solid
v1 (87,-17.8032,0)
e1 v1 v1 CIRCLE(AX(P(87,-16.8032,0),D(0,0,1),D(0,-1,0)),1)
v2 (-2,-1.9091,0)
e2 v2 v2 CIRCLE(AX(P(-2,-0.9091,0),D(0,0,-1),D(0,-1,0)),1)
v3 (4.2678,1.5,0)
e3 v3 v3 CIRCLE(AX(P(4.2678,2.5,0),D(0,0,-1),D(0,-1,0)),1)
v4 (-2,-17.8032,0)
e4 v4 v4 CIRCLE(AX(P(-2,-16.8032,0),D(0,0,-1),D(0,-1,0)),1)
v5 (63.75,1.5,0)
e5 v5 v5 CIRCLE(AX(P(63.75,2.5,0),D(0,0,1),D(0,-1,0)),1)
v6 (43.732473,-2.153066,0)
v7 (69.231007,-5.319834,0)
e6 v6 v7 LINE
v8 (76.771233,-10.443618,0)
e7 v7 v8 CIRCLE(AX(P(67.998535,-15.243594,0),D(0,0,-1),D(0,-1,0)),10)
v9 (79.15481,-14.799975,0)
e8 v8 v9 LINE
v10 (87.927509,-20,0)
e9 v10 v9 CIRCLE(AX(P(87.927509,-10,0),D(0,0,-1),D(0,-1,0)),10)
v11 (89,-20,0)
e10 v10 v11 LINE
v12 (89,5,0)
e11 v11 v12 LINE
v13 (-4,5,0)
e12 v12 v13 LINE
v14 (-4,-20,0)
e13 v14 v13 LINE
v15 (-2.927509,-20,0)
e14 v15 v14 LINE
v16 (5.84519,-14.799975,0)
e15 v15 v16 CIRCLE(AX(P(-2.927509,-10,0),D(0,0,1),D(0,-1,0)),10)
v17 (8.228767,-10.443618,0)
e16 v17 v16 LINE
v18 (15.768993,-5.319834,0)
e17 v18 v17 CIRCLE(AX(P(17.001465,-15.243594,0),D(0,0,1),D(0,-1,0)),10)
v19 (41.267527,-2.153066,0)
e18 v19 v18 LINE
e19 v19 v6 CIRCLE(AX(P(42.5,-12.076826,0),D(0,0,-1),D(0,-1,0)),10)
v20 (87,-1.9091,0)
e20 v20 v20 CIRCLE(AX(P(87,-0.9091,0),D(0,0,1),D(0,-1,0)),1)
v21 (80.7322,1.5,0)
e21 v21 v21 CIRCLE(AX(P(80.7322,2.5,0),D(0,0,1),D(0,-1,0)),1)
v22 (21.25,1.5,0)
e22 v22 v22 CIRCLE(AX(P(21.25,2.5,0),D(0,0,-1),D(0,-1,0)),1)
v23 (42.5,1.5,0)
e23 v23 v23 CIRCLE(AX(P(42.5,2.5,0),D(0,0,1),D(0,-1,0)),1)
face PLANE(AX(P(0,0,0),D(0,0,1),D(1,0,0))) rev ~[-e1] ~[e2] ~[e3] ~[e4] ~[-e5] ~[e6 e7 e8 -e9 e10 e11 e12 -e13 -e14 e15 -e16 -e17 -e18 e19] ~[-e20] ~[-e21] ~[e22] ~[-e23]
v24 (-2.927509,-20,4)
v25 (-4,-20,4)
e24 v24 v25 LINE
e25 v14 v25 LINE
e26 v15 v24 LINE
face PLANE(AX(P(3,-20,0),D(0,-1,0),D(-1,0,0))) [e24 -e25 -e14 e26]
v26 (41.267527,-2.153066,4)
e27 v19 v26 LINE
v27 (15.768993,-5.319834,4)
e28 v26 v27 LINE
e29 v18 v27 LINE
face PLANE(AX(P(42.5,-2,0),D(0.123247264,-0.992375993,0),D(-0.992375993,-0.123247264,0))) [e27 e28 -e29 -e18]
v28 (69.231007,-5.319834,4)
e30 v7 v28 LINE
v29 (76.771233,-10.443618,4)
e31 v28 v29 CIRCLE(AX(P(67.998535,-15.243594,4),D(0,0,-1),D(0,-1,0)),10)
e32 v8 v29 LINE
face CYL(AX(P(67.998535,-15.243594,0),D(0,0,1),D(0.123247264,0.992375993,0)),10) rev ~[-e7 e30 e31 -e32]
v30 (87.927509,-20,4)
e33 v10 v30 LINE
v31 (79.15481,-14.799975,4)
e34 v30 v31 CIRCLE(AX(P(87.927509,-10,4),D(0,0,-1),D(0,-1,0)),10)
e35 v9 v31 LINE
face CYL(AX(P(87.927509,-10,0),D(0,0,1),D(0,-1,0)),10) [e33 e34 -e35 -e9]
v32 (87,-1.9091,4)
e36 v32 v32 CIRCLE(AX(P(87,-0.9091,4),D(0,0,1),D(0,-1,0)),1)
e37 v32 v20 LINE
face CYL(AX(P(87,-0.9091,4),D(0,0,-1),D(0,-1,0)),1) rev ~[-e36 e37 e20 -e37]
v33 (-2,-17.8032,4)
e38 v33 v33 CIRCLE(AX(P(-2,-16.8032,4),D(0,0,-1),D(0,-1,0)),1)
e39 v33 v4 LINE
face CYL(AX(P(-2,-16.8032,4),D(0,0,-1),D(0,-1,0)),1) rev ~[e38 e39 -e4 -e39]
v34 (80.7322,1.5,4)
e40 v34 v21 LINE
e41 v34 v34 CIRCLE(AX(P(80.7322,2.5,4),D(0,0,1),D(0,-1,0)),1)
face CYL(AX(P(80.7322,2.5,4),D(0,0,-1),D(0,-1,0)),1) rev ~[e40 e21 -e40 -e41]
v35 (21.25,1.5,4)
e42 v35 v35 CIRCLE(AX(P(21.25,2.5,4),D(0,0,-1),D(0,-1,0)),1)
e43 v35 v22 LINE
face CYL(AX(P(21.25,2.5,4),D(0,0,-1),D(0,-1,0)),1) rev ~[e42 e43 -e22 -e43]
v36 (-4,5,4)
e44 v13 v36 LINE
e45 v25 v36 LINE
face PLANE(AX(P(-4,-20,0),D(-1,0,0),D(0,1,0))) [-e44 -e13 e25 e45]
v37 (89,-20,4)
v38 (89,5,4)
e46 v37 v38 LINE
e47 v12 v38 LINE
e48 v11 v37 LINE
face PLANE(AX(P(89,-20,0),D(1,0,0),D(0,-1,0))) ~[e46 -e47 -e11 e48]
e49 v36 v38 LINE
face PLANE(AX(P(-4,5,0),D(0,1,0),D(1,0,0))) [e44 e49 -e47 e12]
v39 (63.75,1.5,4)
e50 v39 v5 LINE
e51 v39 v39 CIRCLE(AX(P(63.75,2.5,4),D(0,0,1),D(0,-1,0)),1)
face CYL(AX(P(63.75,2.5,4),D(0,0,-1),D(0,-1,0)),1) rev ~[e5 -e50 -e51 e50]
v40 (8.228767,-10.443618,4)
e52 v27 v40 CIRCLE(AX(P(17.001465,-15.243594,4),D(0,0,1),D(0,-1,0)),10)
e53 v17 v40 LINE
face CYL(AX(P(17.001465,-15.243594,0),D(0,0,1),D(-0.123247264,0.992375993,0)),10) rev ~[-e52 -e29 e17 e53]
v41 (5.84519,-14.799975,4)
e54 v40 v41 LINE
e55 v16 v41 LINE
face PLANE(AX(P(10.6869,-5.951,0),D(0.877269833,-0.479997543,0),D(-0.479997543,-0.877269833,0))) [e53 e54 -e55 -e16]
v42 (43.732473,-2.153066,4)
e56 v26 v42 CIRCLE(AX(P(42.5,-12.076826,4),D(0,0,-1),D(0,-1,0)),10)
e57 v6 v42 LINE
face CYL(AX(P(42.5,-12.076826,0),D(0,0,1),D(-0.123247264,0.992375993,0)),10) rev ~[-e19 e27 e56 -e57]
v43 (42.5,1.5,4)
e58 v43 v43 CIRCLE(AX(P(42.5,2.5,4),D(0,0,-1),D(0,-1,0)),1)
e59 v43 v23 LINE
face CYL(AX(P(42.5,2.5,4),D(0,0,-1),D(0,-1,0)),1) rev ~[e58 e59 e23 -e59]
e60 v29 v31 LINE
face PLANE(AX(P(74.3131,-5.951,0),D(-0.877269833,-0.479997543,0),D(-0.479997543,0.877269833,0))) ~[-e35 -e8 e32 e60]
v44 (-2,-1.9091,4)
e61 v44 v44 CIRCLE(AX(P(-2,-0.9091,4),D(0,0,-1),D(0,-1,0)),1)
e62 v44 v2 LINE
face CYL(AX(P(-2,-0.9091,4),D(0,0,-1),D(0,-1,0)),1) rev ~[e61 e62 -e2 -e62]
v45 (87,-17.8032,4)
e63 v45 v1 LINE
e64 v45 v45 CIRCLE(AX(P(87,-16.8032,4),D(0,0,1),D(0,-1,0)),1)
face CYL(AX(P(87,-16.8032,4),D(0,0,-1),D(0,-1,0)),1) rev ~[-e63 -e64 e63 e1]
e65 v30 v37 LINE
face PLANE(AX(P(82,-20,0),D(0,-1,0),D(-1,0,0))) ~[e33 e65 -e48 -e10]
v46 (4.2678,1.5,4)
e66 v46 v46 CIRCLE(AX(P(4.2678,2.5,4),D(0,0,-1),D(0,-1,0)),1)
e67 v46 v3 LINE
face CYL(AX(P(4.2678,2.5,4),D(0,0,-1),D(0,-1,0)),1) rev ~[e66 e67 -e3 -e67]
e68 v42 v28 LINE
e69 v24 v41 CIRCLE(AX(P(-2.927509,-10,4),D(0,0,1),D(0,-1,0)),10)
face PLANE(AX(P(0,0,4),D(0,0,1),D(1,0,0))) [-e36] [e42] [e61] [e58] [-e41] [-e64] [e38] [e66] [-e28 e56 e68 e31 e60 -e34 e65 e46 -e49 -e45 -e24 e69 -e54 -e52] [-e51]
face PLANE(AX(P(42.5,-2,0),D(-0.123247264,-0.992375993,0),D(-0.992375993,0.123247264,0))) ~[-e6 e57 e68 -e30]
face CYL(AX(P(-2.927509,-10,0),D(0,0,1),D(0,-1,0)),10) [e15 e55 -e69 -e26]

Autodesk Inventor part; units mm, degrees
ref_plane "YZ Plane" through (0, 0, 0) normal (1, 0, 0) x (0, 1, 0)
ref_plane "XZ Plane" through (0, 0, 0) normal (0, 1, 0) x (-1, 0, 0)
ref_plane "XY Plane" through (0, 0, 0) normal (0, 0, 1) x (1, 0, 0)
sketch "Sketch1" plane through (0, 0, 0) normal (0, 0, 1) x (1, 0, 0)
  line L0 (-3.5, 6) -> (-3.5, -50) construction
  line L1 (-3.5, -50) -> (0, -50) construction
  line L2 (0, -50) -> (0, 6) construction
  line L3 (-3.5, 6) -> (0, 6) construction
  line L4 (0, 0) -> (85, 0) construction
  line L5 (85, 0) -> (85, 5) construction
  line L6 (0, 5) -> (85, 5) construction
  line L7 (0, 0) -> (0, 5) construction
  line L8 (88.5, 6) -> (88.5, -50) construction
  line L9 (88.5, 6) -> (85, 6) construction
  line L10 (85, -50) -> (85, 6) construction
  line L11 (88.5, -50) -> (85, -50) construction
  line L12 (-4, 5) -> (42.5, 5)
  line L13 (42.5, 5) -> (42.5, -2)
  line L14 (42.5, -2) -> (10.6869, -5.951)
  line L15 (10.6869, -5.951) -> (3, -20)
  line L16 (3, -20) -> (-4, -20)
  line L17 (-4, -20) -> (-4, 5)
  line L18 (0, 2.5) -> (42.5, 2.5) construction
  line L19 (-2, 5) -> (-2, -20) construction
  point P0 (4.2678, 2.5)
  point P1 (21.25, 2.5)
  point P2 (-2, -0.9091)
  point P3 (-2, -16.8032)
  dimension "d0" = 4
  dimension "d1" = 25
  dimension "d2" = 7
  dimension "d3" = 7
  dimension "d7" = 2
extrude "Extrusion1" add sketch "Sketch1" along normal blind 4
sketch "Sketch2" plane through (0, 0, 4) normal (0, 0, 1) x (1, 0, 0)
  point P0 (0, 0)
  point P1 (42.5, 2.5)
  point P2 (42.5, 2.5)
  point P3 (21.25, 2.5)
  point P4 (4.2678, 2.5)
  point P5 (-2, -0.9091)
  point P6 (-2, -16.8032)
hole "Hole1" at (42.5, 2.5, 4) at (21.25, 2.5, 4) at (4.2678, 2.5, 4) at (-2, -0.9091, 4) at (-2, -16.8032, 4) direction (0, 0, -1) diameter 2 end through all
mirror "Mirror1" about plane through (42.5, -2, 0) normal (1, 0, 0)
fillet "Fillet1" radius 10 5 edges at (3, -20, 2) (10.6869, -5.951, 2) (42.5, -2, 2) (74.3131, -5.951, 2) (82, -20, 2)
properties part number "segment0c"
